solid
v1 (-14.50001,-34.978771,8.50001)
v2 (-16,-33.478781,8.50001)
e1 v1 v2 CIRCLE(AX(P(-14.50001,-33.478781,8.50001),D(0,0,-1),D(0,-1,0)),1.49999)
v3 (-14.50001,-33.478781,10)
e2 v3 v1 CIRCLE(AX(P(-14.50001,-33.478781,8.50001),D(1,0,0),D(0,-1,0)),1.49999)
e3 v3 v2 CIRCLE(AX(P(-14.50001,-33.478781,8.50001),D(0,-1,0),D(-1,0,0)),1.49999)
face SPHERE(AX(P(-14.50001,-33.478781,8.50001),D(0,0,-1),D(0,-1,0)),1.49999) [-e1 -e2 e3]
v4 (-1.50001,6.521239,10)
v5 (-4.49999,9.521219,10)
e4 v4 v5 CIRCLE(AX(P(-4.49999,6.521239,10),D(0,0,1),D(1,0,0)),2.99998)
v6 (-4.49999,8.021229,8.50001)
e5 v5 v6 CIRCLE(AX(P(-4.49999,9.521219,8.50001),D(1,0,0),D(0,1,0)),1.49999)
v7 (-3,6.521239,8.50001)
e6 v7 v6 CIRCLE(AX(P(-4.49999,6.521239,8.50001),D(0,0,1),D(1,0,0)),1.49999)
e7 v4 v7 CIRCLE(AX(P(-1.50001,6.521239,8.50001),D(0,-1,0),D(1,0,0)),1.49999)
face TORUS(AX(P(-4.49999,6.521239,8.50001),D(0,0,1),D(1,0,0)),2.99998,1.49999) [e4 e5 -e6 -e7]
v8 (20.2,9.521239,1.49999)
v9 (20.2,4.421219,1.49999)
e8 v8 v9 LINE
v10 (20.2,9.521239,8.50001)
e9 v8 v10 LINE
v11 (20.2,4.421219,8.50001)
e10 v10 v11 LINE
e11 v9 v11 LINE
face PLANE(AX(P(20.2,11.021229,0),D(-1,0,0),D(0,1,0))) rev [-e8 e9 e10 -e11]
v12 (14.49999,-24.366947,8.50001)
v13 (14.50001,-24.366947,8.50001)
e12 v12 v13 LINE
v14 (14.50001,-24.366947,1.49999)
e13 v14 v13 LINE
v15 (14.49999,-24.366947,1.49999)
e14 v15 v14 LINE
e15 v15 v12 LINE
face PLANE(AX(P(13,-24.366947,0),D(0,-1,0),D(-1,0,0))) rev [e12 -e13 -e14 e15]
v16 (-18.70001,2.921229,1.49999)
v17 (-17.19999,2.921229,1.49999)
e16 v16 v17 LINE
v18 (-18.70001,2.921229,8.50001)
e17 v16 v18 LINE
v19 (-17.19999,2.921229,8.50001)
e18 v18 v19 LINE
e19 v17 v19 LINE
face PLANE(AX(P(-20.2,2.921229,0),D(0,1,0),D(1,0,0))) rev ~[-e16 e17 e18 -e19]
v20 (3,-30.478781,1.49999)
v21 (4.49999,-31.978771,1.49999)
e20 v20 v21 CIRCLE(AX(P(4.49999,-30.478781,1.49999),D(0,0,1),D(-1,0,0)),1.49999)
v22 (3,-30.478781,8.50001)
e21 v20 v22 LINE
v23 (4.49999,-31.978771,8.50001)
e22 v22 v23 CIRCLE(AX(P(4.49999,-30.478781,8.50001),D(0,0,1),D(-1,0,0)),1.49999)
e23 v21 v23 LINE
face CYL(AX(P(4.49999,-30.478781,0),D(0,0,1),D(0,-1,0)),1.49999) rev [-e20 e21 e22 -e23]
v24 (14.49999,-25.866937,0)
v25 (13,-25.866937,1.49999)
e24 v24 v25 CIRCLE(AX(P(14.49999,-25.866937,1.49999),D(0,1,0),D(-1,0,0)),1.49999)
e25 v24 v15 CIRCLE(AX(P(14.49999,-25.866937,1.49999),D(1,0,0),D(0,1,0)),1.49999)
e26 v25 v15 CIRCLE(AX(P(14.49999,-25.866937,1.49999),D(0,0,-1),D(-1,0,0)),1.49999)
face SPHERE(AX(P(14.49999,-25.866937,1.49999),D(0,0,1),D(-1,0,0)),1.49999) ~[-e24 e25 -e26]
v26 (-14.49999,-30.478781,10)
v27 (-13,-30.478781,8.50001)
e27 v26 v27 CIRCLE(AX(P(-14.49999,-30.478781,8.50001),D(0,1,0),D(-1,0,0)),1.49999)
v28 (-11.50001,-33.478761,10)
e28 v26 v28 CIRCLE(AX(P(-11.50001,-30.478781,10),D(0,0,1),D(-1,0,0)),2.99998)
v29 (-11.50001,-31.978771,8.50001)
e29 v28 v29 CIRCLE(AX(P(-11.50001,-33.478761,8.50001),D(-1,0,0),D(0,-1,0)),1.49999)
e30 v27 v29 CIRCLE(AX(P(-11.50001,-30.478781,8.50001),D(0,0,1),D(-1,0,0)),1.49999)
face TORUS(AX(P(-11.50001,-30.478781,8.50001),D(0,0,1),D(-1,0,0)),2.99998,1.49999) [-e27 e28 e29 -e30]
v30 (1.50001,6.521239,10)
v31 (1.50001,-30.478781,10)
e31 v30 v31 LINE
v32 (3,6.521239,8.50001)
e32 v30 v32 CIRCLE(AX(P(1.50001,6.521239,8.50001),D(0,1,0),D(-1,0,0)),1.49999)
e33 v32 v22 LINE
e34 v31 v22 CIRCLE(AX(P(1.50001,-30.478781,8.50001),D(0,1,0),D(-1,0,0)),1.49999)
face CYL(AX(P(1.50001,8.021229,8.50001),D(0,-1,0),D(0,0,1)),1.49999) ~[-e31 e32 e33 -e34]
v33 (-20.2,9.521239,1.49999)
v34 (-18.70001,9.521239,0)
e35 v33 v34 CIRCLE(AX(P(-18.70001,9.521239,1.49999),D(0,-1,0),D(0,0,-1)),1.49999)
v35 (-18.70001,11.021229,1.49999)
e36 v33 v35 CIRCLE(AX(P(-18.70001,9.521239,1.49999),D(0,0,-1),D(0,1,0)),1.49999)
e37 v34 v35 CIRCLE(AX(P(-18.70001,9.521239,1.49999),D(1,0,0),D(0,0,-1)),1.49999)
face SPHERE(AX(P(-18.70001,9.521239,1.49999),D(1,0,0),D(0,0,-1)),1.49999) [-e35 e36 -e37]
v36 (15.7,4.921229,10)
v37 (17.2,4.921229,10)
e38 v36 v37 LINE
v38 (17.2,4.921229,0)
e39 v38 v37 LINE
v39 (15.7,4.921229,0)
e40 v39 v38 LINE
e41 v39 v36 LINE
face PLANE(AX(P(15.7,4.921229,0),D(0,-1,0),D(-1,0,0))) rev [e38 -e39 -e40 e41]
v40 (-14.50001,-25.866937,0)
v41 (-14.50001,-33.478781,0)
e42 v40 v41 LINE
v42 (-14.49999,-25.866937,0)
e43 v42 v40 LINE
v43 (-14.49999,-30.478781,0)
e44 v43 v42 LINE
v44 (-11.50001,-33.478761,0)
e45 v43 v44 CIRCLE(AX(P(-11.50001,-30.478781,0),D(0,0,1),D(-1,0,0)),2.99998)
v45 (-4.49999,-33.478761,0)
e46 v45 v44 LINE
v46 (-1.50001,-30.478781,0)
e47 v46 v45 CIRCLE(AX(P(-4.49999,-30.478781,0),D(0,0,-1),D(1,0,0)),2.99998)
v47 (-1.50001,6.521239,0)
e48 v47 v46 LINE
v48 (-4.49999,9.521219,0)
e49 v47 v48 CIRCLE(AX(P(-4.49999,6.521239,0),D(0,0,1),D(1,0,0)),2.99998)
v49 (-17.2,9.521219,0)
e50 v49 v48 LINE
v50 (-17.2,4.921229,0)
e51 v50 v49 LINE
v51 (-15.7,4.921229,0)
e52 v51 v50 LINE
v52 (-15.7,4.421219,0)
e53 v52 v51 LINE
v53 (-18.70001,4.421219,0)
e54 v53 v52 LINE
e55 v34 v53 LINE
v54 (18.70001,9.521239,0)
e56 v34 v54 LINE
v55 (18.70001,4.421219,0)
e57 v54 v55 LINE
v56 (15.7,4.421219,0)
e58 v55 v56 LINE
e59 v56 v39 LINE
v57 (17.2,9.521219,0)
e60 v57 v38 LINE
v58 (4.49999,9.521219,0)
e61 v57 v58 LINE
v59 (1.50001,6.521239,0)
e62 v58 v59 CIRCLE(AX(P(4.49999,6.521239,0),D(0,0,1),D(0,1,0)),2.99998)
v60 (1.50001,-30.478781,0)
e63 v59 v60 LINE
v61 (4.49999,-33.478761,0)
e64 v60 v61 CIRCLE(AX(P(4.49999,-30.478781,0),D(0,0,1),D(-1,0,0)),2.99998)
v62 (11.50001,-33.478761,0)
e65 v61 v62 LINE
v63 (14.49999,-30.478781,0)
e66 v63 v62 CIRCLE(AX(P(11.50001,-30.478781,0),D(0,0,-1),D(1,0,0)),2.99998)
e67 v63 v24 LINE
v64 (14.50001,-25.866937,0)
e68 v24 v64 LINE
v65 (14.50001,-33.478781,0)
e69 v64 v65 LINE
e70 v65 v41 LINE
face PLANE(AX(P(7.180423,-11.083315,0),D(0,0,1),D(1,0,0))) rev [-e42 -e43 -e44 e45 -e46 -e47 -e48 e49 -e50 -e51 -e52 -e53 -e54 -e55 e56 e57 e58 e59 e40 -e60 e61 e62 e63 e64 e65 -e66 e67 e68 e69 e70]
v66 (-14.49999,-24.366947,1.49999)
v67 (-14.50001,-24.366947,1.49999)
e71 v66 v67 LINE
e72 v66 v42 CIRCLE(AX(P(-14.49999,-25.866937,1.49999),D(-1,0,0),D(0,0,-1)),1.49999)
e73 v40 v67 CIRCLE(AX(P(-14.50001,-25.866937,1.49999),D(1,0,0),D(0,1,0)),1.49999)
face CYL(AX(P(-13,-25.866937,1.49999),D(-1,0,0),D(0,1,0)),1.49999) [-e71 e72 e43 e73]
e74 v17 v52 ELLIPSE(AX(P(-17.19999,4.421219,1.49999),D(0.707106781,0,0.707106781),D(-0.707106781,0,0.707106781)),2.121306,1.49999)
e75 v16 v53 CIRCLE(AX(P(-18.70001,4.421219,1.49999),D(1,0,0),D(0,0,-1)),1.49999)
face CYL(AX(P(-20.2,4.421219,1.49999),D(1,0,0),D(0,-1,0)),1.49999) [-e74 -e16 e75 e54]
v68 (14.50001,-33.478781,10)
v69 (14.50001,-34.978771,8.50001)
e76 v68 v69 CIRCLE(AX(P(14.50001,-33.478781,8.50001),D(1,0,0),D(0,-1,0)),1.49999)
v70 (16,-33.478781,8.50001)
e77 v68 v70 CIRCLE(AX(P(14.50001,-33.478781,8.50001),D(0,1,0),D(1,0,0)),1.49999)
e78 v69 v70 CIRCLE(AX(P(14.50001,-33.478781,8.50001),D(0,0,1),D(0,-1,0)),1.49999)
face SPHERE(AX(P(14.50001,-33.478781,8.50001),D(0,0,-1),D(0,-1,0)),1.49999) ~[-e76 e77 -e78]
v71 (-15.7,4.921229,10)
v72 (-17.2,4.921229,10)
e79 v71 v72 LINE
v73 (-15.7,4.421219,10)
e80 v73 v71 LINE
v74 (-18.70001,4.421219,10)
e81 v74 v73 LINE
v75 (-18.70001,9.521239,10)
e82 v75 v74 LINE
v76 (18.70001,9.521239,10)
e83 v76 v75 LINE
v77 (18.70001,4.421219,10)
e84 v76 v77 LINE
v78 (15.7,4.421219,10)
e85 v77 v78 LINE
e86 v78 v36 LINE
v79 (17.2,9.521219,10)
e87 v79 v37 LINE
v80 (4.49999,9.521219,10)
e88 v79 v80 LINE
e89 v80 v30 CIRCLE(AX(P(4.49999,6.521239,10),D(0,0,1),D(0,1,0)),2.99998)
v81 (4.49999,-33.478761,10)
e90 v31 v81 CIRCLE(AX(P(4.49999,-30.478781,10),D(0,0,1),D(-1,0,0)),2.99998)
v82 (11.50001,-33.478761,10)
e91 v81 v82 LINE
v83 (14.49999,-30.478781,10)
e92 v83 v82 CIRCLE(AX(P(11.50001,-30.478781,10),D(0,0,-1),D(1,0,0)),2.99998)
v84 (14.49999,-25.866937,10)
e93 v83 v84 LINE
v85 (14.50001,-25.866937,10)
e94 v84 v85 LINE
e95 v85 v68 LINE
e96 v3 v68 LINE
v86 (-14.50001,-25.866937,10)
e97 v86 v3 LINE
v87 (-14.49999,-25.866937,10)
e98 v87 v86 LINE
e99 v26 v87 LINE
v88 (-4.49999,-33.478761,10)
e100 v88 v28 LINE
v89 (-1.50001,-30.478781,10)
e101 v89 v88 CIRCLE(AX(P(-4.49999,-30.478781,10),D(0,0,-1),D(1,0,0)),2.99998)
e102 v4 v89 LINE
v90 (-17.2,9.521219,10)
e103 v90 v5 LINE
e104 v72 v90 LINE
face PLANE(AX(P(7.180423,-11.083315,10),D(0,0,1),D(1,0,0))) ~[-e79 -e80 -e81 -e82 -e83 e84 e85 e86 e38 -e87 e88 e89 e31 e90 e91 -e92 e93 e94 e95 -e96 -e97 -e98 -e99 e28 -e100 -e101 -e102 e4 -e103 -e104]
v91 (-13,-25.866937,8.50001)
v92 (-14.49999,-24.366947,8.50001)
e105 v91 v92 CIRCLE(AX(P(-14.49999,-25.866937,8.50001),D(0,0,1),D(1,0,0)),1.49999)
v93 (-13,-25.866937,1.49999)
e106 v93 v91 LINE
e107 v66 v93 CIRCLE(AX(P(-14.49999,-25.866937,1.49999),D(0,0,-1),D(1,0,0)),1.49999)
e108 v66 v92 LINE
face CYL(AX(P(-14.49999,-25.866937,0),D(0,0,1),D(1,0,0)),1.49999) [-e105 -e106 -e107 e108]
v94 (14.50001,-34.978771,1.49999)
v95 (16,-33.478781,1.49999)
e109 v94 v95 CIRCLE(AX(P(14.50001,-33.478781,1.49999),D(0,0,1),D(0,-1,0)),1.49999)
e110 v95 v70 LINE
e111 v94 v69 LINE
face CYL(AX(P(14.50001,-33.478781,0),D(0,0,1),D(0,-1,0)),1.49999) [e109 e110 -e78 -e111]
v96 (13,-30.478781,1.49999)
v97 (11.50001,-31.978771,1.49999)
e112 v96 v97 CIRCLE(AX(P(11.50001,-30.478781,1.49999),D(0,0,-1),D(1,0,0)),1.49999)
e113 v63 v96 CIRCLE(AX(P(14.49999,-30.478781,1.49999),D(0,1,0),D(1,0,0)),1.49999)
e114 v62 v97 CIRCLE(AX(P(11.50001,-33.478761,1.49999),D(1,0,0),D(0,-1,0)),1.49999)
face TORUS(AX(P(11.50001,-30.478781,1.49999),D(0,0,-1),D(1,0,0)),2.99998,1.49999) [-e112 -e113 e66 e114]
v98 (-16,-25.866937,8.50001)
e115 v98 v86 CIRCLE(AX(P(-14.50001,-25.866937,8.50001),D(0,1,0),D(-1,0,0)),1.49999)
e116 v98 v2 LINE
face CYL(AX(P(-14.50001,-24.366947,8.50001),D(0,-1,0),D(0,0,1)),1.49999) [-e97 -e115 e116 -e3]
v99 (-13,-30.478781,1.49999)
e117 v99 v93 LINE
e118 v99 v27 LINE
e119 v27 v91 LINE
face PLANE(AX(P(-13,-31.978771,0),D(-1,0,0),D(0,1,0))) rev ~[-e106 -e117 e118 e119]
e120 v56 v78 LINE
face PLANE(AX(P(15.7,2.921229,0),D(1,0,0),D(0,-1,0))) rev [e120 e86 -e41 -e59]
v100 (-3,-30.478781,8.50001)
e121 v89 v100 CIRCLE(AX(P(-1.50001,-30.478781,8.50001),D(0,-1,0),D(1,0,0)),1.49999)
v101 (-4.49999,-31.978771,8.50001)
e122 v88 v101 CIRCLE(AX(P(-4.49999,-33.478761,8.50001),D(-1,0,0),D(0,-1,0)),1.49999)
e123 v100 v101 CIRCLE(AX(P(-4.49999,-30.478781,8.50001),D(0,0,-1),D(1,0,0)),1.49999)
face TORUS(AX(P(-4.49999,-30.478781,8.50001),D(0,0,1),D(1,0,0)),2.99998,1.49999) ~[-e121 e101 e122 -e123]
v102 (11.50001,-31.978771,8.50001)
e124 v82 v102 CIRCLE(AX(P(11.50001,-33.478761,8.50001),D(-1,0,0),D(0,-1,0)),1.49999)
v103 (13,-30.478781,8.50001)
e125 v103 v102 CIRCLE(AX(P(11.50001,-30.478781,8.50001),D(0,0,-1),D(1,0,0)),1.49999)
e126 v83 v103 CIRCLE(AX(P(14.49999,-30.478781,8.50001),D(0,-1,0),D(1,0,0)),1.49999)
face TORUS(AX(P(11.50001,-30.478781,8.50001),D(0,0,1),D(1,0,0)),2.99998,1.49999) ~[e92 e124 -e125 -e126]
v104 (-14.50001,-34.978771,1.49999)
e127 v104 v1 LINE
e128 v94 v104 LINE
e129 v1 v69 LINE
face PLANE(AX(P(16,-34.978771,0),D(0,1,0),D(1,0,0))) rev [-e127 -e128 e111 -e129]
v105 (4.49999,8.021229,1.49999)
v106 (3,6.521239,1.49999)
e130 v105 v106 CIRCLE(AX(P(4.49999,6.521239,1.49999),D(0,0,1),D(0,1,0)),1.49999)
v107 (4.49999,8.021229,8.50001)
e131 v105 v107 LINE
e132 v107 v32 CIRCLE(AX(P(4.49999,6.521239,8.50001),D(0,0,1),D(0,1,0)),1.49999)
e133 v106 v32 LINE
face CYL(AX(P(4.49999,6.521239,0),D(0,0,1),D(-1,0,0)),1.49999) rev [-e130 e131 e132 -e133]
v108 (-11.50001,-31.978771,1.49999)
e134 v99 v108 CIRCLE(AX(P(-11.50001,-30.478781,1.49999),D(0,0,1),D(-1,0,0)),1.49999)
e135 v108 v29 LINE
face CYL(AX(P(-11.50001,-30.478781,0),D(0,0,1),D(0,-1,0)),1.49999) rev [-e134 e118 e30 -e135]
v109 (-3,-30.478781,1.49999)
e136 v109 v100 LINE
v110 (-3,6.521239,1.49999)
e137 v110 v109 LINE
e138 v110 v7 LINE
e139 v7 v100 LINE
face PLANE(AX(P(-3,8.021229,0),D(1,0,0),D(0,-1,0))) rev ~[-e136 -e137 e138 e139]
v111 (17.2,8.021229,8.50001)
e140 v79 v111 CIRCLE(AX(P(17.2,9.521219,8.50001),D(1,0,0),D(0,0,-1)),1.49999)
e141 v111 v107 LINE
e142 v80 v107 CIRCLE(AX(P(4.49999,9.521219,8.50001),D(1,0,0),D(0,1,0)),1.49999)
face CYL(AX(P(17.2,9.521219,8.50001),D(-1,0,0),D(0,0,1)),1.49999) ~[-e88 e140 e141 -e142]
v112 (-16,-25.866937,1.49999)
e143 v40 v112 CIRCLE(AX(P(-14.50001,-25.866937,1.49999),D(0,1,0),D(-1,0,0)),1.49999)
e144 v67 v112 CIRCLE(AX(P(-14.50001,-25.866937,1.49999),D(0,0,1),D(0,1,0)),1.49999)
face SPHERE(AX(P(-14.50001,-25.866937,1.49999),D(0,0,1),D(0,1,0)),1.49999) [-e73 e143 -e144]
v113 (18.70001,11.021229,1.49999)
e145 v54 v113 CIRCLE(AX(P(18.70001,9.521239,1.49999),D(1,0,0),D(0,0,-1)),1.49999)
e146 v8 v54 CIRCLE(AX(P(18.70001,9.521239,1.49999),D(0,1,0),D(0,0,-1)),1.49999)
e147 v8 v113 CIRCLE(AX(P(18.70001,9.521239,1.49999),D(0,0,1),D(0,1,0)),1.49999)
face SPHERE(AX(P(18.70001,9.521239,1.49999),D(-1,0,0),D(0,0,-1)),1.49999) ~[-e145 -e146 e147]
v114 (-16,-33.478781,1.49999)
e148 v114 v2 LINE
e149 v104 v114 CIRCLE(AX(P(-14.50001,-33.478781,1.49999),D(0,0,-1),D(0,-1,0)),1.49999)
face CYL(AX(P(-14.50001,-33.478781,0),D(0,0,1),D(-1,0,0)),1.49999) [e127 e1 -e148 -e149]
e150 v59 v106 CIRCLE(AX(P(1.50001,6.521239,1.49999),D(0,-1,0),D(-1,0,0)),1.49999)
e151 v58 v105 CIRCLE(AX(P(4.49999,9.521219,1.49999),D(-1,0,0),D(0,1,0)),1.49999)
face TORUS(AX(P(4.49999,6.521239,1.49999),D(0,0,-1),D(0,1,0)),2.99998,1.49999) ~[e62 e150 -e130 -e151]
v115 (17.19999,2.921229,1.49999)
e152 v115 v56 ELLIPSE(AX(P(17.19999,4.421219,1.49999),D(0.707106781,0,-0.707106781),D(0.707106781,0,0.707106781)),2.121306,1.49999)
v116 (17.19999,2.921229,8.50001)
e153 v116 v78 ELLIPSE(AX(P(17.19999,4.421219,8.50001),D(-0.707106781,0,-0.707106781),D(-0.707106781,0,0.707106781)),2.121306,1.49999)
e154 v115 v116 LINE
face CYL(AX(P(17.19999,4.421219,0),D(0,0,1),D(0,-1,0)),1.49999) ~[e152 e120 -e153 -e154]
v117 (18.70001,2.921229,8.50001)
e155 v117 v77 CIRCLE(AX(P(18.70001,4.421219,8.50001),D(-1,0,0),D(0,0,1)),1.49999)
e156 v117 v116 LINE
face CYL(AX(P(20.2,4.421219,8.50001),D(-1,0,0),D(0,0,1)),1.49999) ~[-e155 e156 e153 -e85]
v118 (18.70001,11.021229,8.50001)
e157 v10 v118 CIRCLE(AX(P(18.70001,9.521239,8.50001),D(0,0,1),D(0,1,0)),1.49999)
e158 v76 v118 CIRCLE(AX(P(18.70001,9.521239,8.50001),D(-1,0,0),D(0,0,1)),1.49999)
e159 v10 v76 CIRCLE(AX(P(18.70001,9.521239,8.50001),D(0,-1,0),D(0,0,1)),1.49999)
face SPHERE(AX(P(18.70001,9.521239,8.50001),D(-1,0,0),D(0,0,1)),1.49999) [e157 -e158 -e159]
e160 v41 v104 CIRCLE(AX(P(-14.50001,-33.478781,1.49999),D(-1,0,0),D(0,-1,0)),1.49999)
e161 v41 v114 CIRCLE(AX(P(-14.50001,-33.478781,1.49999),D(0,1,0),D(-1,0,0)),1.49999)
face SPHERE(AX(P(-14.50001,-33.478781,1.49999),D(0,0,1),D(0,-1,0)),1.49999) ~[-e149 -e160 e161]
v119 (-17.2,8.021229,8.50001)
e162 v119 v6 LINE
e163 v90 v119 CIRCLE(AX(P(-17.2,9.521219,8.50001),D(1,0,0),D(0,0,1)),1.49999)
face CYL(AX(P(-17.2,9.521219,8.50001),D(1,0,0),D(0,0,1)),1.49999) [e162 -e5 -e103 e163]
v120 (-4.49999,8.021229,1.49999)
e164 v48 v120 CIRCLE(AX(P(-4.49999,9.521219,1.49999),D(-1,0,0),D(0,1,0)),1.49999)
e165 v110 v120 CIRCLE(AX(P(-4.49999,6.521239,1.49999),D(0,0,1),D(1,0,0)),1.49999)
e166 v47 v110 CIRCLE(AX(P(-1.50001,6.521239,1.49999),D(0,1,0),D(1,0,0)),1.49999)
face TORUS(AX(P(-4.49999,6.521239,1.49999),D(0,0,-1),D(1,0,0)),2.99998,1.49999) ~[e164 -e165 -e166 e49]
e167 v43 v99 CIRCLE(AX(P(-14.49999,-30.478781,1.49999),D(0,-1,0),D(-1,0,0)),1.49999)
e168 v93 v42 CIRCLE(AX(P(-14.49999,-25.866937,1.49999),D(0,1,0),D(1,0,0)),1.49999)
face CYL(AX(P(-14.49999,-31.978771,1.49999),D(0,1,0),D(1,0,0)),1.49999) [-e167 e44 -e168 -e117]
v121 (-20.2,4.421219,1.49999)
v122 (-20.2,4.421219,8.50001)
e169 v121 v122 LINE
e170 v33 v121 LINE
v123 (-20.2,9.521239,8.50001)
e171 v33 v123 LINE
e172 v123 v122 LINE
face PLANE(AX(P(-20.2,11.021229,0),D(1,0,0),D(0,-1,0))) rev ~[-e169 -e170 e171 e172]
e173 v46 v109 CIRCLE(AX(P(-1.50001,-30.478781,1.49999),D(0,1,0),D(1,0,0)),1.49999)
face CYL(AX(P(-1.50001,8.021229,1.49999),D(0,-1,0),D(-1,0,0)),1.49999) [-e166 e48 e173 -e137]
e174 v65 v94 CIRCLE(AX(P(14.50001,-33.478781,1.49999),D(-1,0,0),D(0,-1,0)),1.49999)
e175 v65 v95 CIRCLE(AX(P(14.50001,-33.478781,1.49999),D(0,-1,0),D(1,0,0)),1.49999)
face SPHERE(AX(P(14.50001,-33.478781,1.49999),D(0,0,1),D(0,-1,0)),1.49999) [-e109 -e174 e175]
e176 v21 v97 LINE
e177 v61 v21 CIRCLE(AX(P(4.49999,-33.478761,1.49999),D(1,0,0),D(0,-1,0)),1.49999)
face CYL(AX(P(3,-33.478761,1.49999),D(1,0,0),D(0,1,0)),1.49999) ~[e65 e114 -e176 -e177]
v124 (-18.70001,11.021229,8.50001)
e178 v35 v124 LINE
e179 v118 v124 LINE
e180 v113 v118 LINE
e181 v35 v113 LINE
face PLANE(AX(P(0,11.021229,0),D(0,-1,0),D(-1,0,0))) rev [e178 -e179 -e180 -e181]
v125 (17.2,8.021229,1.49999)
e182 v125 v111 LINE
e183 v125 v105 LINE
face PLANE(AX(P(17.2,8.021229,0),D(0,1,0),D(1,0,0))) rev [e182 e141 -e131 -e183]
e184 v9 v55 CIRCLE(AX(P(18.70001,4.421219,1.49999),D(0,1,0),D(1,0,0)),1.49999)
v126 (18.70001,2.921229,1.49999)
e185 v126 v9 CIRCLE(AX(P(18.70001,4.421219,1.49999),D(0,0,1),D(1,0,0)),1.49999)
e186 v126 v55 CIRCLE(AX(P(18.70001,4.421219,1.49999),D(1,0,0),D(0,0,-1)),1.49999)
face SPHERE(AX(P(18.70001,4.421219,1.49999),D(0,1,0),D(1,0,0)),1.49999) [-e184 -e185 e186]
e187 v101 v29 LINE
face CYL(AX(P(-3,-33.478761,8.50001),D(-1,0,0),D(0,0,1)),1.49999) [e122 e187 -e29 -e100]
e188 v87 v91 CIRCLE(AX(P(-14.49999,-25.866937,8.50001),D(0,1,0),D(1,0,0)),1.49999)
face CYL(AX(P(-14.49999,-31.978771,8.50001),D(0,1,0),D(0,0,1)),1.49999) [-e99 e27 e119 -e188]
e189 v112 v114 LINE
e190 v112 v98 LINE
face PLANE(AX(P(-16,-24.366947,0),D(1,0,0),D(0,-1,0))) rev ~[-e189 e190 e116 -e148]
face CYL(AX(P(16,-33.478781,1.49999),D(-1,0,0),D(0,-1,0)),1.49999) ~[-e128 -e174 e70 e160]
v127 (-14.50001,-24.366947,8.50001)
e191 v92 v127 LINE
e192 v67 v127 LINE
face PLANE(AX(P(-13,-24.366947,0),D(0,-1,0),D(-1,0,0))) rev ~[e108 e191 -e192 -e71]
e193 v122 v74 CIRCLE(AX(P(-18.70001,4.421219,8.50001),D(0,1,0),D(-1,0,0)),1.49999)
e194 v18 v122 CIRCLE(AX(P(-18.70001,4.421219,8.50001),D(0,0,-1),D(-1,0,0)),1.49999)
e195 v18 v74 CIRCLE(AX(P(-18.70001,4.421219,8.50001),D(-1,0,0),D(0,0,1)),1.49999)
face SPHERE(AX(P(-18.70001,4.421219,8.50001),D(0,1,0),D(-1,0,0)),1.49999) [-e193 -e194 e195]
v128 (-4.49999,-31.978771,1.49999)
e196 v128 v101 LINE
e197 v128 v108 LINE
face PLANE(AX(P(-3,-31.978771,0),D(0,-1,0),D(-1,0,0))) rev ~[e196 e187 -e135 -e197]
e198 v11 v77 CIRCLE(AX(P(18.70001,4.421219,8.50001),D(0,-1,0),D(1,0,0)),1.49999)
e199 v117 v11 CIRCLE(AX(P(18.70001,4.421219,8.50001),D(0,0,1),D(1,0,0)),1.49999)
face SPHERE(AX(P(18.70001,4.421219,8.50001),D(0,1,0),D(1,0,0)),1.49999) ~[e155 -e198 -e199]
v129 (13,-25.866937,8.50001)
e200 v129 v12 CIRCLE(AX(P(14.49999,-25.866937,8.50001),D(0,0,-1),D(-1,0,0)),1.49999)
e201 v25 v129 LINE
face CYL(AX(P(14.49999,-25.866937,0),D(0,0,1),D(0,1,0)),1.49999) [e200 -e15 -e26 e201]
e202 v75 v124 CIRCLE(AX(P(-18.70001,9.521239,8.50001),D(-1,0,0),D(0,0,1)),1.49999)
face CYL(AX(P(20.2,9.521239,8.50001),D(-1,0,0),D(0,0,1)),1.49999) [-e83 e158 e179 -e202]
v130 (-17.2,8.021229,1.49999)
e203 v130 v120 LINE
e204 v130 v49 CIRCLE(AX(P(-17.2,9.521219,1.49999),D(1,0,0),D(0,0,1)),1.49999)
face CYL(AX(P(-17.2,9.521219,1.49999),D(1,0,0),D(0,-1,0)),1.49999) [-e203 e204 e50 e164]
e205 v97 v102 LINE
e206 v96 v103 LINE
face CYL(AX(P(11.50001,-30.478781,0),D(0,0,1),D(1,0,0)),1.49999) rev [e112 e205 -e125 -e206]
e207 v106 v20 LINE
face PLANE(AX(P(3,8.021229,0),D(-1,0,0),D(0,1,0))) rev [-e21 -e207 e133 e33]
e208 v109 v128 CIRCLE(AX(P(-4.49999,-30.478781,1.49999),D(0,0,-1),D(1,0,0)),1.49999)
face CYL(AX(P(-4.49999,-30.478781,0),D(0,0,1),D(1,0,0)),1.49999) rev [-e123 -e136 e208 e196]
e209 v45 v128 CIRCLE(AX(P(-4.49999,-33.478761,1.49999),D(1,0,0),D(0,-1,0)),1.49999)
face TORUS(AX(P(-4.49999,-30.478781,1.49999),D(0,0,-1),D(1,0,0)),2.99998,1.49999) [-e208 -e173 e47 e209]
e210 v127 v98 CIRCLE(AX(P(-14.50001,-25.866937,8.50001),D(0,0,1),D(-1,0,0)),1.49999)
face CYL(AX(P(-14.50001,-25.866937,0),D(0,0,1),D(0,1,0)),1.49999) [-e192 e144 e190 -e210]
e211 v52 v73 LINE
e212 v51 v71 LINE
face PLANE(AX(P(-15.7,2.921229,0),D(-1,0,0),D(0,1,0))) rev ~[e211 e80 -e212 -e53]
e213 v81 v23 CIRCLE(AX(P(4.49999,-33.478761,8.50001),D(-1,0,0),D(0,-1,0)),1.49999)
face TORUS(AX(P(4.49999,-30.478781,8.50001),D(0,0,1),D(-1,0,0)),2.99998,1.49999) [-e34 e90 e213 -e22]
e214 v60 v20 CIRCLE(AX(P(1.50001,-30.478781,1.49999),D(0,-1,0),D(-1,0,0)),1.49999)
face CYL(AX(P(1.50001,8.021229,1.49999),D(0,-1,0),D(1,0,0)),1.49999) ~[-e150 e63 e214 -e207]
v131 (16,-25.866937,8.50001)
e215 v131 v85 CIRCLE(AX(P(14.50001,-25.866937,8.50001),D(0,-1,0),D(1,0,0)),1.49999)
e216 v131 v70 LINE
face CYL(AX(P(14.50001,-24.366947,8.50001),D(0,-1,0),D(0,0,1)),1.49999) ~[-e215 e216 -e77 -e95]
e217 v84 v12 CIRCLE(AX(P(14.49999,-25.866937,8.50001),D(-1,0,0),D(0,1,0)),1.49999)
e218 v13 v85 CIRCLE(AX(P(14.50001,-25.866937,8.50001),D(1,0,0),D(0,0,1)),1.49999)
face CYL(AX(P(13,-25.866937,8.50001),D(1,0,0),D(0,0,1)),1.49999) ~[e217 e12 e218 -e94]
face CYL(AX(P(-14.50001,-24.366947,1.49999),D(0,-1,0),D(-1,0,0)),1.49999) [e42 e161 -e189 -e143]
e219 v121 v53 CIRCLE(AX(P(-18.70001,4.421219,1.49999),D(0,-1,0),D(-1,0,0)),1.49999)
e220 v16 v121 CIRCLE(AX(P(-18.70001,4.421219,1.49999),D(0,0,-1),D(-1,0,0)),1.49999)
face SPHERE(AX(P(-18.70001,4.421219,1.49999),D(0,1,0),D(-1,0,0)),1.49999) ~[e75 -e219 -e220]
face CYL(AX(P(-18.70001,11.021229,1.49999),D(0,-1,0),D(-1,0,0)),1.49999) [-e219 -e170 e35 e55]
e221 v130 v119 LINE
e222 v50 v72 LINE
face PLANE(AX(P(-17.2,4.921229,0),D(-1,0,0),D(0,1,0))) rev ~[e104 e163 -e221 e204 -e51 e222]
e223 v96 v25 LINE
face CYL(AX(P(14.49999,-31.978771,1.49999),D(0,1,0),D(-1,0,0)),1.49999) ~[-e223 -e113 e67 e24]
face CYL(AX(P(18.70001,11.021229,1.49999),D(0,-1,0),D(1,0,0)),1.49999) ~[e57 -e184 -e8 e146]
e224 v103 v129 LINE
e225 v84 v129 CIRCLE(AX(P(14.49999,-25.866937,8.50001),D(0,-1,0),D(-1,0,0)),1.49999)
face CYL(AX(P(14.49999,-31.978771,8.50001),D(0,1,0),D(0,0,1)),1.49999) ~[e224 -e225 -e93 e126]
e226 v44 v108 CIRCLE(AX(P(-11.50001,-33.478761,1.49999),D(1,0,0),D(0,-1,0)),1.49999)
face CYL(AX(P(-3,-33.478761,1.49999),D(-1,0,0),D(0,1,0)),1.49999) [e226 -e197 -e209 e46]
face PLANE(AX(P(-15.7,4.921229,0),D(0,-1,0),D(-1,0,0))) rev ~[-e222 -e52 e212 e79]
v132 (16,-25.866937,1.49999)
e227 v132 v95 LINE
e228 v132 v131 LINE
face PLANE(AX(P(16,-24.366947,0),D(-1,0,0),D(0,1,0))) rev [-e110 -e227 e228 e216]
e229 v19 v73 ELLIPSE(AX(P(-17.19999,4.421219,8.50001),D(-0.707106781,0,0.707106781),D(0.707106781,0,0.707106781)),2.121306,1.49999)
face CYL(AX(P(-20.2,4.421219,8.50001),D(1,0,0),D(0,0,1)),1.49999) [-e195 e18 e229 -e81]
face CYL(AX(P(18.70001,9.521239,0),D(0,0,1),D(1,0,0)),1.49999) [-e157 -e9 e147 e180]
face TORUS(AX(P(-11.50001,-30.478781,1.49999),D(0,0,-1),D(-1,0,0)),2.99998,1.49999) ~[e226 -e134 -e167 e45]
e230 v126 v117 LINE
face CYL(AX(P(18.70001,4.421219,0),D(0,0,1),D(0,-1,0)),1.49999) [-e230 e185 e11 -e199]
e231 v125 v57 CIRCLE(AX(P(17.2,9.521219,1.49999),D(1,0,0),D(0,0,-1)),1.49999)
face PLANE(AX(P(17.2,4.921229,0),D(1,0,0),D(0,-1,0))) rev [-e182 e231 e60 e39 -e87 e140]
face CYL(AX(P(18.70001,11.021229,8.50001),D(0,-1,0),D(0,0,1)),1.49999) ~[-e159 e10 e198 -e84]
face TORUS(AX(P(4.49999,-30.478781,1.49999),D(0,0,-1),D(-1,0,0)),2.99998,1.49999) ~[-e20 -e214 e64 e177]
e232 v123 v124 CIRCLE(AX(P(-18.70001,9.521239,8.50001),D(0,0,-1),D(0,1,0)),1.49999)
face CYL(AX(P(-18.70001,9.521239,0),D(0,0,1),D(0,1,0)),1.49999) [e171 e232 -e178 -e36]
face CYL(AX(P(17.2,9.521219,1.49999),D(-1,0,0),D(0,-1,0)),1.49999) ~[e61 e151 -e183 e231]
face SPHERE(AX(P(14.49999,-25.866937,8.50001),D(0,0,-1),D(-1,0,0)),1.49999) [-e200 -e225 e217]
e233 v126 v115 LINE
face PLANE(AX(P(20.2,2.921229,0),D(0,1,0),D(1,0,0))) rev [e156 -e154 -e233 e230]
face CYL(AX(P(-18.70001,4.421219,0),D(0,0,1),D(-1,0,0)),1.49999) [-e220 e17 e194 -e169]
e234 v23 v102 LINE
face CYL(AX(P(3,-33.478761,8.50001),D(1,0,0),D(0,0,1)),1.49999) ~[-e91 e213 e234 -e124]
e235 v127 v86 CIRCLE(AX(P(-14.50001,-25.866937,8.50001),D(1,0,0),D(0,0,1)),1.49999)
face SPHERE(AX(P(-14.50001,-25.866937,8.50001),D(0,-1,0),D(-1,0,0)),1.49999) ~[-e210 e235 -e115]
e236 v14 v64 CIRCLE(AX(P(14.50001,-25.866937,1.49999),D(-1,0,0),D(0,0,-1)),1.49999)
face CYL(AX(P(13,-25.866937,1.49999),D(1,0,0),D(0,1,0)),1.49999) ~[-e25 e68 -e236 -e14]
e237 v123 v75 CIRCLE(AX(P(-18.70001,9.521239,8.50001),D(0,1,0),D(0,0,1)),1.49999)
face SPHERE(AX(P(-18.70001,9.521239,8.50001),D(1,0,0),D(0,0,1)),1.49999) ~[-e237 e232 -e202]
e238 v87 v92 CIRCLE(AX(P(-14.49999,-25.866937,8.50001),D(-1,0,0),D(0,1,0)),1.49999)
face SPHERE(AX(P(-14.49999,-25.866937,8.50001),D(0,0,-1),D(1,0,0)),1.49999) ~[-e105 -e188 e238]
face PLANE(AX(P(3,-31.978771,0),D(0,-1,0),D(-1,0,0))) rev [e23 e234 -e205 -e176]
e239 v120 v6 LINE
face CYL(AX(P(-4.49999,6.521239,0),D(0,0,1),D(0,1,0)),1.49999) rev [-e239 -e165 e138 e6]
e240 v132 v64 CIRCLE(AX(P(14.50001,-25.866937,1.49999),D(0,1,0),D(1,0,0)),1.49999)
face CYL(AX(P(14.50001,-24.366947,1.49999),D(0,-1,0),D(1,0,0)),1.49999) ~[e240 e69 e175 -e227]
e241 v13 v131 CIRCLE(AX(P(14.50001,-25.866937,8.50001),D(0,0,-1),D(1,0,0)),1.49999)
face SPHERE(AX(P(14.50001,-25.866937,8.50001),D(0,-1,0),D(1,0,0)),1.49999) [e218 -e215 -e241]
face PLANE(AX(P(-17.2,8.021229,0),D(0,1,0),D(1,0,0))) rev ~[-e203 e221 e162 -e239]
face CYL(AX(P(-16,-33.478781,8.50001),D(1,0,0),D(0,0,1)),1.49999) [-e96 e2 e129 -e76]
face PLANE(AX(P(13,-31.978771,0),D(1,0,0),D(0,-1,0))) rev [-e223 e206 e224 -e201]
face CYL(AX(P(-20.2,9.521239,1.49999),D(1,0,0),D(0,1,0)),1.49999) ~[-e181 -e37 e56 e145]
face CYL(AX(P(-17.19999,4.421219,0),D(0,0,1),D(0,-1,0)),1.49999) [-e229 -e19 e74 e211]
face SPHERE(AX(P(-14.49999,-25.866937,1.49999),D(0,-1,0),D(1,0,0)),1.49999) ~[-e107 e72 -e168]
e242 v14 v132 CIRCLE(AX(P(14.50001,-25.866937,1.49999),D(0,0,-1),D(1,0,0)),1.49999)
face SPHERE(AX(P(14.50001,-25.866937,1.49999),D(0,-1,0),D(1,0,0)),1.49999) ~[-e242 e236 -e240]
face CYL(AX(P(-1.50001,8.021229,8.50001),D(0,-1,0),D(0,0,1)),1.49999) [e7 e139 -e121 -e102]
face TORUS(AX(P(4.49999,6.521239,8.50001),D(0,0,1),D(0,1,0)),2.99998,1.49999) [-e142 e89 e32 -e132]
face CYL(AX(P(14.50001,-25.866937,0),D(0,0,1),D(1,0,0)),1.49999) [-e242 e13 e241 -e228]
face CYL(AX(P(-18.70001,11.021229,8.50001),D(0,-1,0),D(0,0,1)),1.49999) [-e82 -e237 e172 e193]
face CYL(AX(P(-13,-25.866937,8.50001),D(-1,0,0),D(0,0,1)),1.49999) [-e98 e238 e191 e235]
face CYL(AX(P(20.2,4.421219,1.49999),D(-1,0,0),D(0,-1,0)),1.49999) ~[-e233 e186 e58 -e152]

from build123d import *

# Parameters (mm, degrees)
F1_DEPTH = 10
F3_R     = 1.49999


# Not quite as in the source:
# - a fillet or chamfer is up to 0.001 mm smaller than in the source, because OpenCascade refuses the exact size
# - a feature names something its author has since deleted; it is built from what else it names


with BuildPart() as f1:
    # F0 (on Top) → F1 (new body)
    with BuildSketch(Plane.XY):
        Polygon((-15.7, 4.9212287627), (-17.2, 4.9212287627), (-17.2, 8.0212287627), (-3, 8.0212287627), (-3, -31.9787712373), (-13, -31.9787712373), (-13, -24.3669471227), (-16, -24.3669471227), (-16, -34.9787712373), (0, -34.9787712373), (0, 11.0212287627), (-20.2, 11.0212287627), (-20.2, 2.9212287627), (-15.7, 2.9212287627), align=None)
    extrude(amount=F1_DEPTH)

    # F2: F1 across face


with BuildPart() as f1_1:
    add(f1.part)
    add(f1.part.mirror(Plane(origin=(0, -11.9787712373, 5), x_dir=(0, 1, 0), z_dir=(1, 0, 0))))

    # F3 (radius 1.5 in the source; OpenCascade refuses exactly that, so slightly less here)
    f3_edges = [f1_1.edges().sort_by_distance(p)[0] for p in [
        (-3, -31.978771, 5),
        (-13, -31.978771, 5),
        (13, -31.978771, 5),
        (3, -31.978771, 5),
        (16, -34.978771, 5),
        (-16, -34.978771, 5),
        (0, 11.021229, 10),
        (0, 11.021229, 0),
        (0, -34.978771, 10),
        (0, -34.978771, 0),
        (3, -11.978771, 10),
        (-3, -11.978771, 10),
        (3, -11.978771, 0),
        (-3, -11.978771, 0),
        (-16, -29.672859, 10),
        (-16, -24.366947, 5),
        (-13, -28.172859, 0),
        (13, -24.366947, 5),
        (16, -29.672859, 0),
        (16, -29.672859, 10),
        (-13, -24.366947, 5),
        (-13, -28.172859, 10),
        (13, -28.172859, 0),
        (13, -28.172859, 10),
        (16, -24.366947, 5),
        (-8, -31.978771, 10),
        (8, -31.978771, 10),
        (-8, -31.978771, 0),
        (8, -31.978771, 0),
        (-14.5, -24.366947, 10),
        (-14.5, -24.366947, 0),
        (14.5, -24.366947, 10),
        (14.5, -24.366947, 0),
        (-16, -29.672859, 0),
        (-20.2, 6.971229, 10),
        (-20.2, 6.971229, 0),
        (20.2, 6.971229, 10),
        (20.2, 6.971229, 0),
        (3, 8.021229, 5),
        (-20.2, 2.921229, 5),
        (20.2, 2.921229, 5),
        (-15.7, 2.921229, 5),
        (15.7, 2.921229, 5),
        (-17.95, 2.921229, 10),
        (-17.95, 2.921229, 0),
        (17.95, 2.921229, 0),
        (17.95, 2.921229, 10),
        (-10.1, 8.021229, 10),
        (-10.1, 8.021229, 0),
        (10.1, 8.021229, 10),
        (10.1, 8.021229, 0),
        (-3, 8.021229, 5),
        (-20.2, 11.021229, 5),
        (20.2, 11.021229, 5),
    ]]
    fillet(f3_edges, radius=F3_R)


solid = f1_1.part
